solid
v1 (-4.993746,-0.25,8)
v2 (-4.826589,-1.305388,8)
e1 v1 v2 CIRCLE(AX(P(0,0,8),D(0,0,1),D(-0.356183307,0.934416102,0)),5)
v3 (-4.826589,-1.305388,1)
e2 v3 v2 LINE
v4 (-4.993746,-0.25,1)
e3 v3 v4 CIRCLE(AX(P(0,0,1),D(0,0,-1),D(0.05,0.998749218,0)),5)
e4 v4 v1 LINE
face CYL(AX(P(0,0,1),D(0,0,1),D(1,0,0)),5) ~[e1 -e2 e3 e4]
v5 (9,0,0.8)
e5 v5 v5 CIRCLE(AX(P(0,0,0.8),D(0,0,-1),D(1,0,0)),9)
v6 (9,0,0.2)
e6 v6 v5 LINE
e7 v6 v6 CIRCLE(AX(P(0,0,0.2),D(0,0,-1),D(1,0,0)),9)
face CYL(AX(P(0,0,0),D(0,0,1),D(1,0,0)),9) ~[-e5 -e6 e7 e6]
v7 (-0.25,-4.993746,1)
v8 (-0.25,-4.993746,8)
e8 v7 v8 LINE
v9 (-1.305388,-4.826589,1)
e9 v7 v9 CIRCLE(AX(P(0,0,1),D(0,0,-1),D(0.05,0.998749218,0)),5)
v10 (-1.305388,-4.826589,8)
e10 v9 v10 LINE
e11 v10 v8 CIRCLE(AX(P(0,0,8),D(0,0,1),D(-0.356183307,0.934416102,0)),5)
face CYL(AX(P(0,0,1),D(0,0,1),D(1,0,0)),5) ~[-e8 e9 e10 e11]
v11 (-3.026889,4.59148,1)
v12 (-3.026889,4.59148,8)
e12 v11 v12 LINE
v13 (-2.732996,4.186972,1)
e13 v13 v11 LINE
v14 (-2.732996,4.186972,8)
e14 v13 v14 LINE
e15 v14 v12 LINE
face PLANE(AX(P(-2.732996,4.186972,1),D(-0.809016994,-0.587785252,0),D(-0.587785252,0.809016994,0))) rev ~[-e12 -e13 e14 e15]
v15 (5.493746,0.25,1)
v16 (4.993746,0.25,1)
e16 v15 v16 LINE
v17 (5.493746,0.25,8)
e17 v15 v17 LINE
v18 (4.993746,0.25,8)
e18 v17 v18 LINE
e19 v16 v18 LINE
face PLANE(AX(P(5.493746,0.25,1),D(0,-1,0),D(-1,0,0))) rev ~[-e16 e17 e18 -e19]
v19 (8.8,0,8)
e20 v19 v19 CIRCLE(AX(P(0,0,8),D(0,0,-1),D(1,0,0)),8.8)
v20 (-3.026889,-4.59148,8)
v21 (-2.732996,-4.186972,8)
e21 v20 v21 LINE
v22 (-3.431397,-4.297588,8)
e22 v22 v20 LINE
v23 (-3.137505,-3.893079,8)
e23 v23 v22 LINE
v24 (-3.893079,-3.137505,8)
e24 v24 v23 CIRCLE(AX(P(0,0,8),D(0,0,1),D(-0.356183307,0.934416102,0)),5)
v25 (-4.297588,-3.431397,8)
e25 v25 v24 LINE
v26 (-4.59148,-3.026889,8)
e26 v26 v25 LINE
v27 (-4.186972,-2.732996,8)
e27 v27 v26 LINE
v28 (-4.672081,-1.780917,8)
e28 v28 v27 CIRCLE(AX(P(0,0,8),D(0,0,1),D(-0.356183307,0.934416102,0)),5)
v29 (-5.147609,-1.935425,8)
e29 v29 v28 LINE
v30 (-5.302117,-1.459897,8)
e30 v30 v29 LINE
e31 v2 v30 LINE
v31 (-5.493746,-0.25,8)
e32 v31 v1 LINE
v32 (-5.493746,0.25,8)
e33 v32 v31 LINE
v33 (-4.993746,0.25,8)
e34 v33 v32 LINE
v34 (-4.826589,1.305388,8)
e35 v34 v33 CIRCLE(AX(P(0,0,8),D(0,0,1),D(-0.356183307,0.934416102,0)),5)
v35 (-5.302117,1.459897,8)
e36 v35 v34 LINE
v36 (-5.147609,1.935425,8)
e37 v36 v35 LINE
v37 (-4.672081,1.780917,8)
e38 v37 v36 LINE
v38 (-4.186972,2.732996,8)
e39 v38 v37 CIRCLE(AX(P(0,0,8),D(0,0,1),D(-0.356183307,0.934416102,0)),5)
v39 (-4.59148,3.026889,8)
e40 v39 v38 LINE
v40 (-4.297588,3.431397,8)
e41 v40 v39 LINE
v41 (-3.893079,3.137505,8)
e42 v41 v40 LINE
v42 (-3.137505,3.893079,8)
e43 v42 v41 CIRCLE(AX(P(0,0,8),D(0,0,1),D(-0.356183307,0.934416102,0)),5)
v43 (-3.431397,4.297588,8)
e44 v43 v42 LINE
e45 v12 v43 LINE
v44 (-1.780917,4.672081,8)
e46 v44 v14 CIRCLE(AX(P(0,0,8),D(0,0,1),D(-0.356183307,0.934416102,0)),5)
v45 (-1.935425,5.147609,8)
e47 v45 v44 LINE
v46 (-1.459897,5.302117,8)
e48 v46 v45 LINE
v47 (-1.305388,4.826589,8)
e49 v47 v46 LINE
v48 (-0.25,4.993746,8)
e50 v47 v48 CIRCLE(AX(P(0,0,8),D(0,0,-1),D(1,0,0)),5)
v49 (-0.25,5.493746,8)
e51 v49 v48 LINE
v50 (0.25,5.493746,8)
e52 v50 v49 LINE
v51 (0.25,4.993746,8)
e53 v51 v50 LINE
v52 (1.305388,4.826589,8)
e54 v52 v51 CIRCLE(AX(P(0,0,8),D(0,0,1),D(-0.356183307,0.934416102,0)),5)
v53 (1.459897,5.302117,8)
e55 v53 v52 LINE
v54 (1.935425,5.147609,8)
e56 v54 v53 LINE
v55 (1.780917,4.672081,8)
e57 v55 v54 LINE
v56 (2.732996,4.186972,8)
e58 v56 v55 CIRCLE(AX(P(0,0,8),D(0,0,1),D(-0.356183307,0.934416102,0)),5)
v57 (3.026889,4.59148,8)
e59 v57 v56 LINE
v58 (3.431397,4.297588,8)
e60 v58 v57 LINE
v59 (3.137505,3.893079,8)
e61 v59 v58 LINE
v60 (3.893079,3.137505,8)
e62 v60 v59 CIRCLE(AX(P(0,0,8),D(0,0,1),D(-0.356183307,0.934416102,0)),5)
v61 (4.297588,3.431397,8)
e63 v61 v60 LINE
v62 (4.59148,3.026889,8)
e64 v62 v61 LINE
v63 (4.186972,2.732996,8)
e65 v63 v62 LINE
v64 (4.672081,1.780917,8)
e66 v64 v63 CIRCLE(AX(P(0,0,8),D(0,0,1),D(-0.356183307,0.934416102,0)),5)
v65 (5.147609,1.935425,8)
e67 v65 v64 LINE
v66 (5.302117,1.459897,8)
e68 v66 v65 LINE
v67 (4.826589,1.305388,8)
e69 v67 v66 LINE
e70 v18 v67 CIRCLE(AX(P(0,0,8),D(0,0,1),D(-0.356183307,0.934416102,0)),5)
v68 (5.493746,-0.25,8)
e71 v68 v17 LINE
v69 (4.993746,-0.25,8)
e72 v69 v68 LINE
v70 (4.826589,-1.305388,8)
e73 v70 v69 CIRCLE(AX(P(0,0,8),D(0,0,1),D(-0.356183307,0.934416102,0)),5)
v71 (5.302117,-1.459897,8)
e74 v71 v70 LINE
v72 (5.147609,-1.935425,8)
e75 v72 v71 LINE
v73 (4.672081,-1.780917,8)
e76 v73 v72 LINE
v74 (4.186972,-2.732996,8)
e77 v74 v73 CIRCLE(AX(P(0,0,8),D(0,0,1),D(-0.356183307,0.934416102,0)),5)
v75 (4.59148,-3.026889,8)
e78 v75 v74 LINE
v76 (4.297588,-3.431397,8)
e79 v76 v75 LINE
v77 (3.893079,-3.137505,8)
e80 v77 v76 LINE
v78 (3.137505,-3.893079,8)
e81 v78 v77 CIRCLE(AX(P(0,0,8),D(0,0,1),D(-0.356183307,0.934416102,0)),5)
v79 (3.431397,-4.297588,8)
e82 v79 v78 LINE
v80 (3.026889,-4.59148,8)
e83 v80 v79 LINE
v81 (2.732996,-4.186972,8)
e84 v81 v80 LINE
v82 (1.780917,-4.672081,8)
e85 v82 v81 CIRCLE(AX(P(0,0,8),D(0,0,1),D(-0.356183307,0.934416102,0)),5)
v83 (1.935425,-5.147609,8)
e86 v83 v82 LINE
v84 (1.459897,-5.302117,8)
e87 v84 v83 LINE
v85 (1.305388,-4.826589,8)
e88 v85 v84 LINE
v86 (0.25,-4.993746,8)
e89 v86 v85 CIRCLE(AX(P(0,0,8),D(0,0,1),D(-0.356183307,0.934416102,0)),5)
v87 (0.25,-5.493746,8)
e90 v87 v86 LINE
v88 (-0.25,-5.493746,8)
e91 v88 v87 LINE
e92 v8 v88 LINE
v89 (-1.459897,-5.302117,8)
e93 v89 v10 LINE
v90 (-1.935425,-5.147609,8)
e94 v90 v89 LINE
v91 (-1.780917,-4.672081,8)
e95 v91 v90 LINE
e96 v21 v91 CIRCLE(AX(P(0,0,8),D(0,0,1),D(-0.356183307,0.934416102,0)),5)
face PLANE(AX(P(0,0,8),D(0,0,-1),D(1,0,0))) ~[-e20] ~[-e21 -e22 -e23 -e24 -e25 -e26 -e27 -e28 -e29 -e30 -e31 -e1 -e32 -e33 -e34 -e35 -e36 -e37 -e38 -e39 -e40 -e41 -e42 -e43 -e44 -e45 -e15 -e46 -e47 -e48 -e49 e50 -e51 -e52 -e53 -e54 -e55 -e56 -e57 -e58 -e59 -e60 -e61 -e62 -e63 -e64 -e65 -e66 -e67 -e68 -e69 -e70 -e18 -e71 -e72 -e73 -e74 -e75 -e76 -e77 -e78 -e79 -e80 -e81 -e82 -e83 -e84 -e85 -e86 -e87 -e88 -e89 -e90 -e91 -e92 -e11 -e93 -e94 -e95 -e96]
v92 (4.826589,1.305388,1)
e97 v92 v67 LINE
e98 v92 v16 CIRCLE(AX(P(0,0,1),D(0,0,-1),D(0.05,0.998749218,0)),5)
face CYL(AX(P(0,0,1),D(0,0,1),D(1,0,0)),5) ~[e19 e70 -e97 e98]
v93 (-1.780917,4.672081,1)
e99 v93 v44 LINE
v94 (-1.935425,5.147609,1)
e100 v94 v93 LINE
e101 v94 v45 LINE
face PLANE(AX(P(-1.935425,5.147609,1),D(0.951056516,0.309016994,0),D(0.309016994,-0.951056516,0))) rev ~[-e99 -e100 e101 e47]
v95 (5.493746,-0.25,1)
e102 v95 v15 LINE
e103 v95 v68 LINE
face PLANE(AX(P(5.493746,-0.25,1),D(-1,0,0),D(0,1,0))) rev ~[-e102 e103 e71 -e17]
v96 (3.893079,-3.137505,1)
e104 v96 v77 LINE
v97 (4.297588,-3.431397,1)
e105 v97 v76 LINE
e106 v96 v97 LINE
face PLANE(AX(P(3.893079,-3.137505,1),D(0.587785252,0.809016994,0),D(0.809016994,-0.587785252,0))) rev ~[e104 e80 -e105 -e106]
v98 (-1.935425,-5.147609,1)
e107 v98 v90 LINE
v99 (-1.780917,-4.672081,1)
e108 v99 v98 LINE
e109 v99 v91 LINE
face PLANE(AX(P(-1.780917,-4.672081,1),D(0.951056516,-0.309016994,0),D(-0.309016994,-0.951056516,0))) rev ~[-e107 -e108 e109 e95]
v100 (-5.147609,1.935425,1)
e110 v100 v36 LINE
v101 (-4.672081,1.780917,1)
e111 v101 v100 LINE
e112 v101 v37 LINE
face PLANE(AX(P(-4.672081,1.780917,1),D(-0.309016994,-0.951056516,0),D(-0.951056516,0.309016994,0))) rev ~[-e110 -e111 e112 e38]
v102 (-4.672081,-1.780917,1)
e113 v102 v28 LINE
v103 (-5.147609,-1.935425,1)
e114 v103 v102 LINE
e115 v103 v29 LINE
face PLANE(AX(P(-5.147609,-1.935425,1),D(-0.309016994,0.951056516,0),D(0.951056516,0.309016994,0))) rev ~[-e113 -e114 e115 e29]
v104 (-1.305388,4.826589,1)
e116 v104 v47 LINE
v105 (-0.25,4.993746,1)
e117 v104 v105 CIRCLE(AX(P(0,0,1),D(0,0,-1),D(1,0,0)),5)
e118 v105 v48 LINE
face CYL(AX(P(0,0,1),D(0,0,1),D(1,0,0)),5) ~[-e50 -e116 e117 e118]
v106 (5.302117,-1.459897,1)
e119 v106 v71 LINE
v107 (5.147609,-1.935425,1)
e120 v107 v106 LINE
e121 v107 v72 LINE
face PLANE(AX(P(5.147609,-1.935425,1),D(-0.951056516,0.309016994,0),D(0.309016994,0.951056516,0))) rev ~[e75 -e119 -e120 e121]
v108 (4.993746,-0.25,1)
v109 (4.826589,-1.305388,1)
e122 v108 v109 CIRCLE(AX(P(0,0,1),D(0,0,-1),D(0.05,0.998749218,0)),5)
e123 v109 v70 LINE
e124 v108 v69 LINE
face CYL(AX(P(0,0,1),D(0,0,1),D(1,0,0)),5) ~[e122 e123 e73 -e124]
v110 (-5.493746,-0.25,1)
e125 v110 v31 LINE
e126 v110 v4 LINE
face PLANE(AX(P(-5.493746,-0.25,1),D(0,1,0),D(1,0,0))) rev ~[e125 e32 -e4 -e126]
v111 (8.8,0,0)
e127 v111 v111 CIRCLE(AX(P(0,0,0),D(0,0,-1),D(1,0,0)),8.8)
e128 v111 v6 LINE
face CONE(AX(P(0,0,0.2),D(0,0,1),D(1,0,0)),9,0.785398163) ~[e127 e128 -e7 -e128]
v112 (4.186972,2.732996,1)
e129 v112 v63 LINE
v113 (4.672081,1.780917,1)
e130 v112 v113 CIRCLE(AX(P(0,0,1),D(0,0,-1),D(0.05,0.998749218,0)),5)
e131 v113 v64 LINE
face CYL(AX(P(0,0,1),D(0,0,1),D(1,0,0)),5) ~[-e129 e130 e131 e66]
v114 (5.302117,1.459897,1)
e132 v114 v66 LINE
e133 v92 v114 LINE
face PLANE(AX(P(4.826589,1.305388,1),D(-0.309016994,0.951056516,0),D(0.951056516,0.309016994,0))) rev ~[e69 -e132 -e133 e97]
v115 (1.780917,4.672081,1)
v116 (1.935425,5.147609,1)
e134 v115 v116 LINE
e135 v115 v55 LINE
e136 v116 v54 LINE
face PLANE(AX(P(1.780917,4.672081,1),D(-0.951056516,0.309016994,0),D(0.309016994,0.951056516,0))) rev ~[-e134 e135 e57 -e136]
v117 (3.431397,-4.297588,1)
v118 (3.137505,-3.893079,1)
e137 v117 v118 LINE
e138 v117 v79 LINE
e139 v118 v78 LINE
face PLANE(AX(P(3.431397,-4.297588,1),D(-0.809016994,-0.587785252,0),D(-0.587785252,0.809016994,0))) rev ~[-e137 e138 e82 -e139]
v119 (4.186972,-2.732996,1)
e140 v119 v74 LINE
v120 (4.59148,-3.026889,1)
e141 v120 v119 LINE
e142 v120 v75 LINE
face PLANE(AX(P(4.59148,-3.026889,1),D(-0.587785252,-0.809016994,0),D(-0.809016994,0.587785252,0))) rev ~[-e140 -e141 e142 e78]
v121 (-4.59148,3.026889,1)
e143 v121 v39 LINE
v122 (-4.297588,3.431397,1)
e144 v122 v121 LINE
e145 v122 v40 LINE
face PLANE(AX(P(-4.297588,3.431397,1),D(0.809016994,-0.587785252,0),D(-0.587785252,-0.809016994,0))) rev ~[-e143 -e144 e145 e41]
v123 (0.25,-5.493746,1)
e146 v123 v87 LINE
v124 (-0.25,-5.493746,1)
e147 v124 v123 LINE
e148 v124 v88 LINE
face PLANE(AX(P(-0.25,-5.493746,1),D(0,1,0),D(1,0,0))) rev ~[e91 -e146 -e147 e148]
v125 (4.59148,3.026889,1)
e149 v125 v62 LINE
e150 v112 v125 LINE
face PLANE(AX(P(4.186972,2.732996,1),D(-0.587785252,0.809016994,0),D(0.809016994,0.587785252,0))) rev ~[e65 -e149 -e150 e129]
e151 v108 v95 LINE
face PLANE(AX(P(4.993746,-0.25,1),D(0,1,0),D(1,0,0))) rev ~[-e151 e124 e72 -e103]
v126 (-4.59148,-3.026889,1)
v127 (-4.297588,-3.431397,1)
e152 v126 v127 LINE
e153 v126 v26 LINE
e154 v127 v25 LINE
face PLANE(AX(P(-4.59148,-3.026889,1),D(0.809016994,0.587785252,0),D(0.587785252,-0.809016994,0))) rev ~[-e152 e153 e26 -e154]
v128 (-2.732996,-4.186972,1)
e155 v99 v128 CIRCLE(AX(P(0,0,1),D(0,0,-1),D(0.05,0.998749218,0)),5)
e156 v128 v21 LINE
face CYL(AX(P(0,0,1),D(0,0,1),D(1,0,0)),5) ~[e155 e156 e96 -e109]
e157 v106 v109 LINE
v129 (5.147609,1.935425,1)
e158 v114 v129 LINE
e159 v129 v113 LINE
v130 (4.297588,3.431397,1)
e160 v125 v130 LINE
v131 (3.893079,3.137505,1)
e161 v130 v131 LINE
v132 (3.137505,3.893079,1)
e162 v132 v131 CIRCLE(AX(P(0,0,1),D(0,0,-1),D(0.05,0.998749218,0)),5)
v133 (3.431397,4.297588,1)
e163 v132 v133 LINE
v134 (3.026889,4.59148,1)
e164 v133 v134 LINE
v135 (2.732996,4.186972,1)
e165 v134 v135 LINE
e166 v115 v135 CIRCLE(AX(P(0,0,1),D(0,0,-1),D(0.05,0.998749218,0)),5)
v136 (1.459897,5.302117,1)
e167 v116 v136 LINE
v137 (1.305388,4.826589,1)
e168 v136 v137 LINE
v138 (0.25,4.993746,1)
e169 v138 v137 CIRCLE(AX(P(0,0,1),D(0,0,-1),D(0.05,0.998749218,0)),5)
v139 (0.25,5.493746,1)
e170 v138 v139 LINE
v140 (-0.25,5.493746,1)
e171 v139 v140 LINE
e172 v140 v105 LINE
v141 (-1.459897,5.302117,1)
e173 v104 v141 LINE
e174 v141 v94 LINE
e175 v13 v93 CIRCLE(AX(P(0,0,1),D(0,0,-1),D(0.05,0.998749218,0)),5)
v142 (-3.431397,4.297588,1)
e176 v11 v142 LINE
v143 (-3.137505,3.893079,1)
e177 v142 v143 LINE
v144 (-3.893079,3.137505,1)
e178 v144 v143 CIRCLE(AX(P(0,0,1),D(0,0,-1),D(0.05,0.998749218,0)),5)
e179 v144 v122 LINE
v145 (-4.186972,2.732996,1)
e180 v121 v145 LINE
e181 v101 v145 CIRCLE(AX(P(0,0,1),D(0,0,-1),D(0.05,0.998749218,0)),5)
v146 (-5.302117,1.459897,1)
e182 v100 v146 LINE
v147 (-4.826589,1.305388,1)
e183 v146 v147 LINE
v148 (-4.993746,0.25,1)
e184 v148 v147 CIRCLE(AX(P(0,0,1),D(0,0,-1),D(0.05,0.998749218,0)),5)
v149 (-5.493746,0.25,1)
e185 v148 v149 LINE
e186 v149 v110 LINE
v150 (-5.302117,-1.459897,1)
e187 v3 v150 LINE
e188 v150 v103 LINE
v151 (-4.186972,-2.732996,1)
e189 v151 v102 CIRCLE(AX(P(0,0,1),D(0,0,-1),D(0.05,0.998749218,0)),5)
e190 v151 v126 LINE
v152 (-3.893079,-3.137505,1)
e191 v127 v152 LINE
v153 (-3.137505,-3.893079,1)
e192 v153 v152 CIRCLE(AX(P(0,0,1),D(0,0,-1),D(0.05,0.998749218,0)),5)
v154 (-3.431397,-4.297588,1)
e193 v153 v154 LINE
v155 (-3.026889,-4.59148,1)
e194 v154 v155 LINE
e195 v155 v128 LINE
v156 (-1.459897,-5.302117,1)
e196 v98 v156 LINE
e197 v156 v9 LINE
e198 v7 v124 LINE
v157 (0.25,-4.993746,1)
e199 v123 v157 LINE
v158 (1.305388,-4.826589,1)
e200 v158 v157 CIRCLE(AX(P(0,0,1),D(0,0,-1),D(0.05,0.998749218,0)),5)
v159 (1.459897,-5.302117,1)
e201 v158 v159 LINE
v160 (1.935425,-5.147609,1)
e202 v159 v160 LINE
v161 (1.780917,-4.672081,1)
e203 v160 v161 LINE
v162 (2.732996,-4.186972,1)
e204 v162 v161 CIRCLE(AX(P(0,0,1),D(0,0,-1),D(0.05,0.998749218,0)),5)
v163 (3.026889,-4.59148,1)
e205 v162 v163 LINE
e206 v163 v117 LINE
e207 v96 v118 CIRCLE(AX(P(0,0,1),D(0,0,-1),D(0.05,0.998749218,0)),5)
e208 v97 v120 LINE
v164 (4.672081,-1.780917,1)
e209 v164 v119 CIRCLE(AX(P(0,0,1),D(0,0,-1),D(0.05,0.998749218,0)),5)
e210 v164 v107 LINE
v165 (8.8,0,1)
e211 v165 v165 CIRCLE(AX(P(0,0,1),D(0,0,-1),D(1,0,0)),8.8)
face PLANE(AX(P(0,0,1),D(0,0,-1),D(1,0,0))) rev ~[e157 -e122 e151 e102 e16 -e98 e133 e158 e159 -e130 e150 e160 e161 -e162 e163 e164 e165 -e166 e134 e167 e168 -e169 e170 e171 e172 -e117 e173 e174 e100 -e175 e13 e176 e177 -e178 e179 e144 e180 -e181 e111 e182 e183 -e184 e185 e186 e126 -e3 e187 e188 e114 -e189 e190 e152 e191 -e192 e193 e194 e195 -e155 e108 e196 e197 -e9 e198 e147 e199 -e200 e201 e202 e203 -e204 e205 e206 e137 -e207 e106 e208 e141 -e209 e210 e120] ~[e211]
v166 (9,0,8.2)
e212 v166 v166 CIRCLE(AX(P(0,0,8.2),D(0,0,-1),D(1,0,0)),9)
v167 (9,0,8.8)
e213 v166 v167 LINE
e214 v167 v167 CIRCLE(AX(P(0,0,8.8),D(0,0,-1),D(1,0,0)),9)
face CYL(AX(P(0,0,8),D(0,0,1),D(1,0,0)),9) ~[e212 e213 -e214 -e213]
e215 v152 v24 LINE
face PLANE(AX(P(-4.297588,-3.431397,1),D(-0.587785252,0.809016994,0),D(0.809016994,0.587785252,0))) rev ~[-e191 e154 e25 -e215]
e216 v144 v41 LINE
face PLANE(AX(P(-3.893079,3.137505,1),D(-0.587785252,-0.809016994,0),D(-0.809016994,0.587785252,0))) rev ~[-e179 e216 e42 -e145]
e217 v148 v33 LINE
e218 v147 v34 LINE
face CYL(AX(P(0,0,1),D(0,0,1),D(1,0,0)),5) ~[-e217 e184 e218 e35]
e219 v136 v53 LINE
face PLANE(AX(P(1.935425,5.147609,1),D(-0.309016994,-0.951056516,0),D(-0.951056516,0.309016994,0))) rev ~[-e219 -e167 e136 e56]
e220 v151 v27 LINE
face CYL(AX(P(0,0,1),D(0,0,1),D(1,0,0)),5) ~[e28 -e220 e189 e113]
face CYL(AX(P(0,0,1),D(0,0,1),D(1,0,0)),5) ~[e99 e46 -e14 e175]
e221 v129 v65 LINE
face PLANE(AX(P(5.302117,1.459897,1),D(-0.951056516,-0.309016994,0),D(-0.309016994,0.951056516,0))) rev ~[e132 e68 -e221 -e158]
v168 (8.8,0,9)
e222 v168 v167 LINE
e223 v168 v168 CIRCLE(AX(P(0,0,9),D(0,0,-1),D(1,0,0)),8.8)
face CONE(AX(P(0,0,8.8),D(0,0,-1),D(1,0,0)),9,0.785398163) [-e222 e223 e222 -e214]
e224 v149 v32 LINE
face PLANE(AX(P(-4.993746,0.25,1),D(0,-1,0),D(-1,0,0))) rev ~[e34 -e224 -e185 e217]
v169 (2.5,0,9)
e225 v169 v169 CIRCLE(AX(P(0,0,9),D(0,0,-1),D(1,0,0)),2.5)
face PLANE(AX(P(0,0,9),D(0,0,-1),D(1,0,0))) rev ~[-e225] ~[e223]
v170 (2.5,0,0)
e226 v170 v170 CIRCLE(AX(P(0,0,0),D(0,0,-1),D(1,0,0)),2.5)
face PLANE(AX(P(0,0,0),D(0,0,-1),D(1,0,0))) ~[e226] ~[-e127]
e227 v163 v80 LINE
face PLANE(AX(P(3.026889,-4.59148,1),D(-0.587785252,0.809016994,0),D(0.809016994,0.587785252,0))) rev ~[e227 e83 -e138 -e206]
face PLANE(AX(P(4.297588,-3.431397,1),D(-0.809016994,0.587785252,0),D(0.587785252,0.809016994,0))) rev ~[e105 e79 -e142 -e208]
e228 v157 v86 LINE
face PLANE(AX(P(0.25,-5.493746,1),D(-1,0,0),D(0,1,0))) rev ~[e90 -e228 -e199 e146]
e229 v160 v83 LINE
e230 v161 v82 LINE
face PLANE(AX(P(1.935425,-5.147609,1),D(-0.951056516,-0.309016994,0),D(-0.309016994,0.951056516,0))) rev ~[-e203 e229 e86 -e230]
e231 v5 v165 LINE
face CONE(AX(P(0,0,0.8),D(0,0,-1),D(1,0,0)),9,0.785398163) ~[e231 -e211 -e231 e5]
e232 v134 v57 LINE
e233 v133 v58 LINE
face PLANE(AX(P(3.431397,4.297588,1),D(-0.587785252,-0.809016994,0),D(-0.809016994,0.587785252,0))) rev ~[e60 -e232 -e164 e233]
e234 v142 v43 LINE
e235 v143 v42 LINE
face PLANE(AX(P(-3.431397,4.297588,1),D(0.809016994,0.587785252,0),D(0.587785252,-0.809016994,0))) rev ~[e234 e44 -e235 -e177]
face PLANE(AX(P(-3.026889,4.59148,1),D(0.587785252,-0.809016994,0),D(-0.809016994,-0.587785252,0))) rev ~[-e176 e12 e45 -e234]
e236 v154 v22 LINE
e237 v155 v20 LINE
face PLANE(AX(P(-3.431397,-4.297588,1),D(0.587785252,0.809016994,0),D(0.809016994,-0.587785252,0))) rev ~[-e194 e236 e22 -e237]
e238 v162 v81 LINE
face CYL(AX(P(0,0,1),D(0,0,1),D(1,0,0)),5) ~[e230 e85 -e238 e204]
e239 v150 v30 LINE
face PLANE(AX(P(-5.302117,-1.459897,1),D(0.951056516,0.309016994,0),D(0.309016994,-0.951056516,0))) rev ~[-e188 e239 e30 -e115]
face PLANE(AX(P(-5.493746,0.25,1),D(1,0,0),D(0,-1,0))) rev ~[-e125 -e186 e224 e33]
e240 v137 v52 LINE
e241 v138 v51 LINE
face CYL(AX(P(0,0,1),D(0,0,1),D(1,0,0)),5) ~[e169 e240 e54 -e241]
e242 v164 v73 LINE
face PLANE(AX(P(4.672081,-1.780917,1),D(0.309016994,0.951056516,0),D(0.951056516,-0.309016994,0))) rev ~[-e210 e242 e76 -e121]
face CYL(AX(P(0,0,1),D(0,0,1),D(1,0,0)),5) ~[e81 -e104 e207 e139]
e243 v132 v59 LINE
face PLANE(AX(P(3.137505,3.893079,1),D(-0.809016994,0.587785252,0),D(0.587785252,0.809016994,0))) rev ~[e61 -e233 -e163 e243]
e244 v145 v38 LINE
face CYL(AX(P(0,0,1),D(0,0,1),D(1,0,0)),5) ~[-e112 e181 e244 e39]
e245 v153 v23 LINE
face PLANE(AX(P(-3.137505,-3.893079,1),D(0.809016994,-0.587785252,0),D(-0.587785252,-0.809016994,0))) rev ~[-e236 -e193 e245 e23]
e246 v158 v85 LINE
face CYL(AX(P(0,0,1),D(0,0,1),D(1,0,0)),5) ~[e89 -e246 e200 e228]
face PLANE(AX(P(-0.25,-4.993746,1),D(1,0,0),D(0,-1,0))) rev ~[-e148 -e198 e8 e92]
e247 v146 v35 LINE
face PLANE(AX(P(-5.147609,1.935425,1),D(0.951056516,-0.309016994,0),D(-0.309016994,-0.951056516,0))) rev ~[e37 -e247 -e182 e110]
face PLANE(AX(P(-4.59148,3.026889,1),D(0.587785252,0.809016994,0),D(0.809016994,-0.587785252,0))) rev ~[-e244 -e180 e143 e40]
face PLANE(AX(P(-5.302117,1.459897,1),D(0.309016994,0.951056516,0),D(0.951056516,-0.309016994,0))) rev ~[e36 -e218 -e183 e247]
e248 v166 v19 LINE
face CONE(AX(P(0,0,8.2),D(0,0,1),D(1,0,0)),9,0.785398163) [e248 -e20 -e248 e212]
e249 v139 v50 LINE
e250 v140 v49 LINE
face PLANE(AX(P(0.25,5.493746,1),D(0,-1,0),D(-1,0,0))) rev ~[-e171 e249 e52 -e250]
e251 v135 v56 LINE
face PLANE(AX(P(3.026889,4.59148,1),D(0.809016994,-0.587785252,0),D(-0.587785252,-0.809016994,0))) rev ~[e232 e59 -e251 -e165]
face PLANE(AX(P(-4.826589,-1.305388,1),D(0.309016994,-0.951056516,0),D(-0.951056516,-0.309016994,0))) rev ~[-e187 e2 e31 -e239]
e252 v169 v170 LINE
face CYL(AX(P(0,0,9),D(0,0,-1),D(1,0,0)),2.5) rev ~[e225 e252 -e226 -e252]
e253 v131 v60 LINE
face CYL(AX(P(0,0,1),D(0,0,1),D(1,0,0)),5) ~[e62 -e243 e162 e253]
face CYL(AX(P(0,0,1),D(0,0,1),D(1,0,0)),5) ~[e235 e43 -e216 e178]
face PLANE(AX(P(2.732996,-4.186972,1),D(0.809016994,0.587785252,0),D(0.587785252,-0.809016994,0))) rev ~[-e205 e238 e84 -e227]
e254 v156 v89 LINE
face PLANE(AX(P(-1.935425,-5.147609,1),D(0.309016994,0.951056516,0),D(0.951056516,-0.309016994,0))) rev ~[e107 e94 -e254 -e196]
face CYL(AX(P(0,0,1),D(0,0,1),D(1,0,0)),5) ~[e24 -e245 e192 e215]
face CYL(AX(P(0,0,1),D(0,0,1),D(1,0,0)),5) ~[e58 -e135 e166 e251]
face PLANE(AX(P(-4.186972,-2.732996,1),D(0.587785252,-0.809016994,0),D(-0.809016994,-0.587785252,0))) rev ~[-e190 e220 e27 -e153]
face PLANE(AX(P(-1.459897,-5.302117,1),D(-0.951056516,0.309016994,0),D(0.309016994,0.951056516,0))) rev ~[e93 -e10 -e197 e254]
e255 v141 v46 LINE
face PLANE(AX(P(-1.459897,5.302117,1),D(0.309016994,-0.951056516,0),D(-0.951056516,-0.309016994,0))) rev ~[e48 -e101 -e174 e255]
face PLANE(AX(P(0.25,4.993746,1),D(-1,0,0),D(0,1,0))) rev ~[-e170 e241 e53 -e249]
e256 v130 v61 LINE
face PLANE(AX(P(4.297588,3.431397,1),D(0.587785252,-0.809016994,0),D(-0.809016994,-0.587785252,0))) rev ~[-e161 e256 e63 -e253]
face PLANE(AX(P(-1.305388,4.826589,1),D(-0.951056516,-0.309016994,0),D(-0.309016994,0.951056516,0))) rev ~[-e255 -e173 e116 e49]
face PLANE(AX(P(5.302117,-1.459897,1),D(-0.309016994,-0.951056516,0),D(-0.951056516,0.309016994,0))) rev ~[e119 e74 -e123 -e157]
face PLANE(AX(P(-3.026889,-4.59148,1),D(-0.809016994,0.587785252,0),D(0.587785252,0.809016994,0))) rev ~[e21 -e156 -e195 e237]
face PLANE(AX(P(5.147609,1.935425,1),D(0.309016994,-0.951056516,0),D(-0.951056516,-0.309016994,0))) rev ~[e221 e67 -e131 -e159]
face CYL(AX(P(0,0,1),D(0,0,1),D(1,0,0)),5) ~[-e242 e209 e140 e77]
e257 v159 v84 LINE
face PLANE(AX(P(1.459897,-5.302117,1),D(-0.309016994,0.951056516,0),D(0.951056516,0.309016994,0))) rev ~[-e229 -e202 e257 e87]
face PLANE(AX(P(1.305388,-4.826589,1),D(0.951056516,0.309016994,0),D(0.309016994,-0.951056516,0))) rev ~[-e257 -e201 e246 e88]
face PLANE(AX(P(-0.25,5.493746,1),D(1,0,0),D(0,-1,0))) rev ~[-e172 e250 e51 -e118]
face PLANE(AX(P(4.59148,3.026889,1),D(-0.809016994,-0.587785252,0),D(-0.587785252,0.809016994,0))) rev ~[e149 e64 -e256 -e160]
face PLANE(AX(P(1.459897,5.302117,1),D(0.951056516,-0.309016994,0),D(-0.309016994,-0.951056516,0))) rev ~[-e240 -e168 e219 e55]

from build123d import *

# Parameters (mm, degrees)
F3_DEPTH        = 7
F3_COPIES_COUNT = 20
F4_SIZE         = 0.2


# Not quite as in the source:
# - a pattern or mirror of a feature is missing from the dataset's text; its kind, count and spacing are read off the source's solid


with BuildPart() as f1:
    # F0 (on Front) → F1 (revolve)
    with BuildSketch(Plane.XZ):
        Polygon((2.5, 9), (2.5, 0), (9, 0), (9, 1), (5, 1), (5, 8), (9, 8), (9, 9), align=None)
    revolve(axis=Axis((0, 0, 4.5), (0, 0, -1)))

    # F2 (on face) → F3 (join, through all)
    with BuildSketch(Plane.XY.offset(1)):
        with BuildLine():
            Line((-0.25, 5.4937460889), (-0.25, 4.9937460889))
            ThreePointArc((-0.25, 4.9937460889), (0, 5), (0.25, 4.9937460889))
            Line((0.25, 4.9937460889), (0.25, 5.4937460889))
            Line((0.25, 5.4937460889), (-0.25, 5.4937460889))
        make_face()
    f3 = extrude(amount=F3_DEPTH)

    # F3_copies: F3 ×20 about axis
    f3_copies_axis = Axis((0, 0, 0), (0, 0, 1))
    for i in range(1, F3_COPIES_COUNT):
        add(f3.rotate(f3_copies_axis, i * 360 / F3_COPIES_COUNT))

    # F4
    f4_edges = [f1.edges().sort_by_distance(p)[0] for p in [
        (-9, 0, 9),
        (-9, 0, 8),
        (-9, 0, 1),
        (-9, 0, 0),
    ]]
    chamfer(f4_edges, length=F4_SIZE)


solid = f1.part
